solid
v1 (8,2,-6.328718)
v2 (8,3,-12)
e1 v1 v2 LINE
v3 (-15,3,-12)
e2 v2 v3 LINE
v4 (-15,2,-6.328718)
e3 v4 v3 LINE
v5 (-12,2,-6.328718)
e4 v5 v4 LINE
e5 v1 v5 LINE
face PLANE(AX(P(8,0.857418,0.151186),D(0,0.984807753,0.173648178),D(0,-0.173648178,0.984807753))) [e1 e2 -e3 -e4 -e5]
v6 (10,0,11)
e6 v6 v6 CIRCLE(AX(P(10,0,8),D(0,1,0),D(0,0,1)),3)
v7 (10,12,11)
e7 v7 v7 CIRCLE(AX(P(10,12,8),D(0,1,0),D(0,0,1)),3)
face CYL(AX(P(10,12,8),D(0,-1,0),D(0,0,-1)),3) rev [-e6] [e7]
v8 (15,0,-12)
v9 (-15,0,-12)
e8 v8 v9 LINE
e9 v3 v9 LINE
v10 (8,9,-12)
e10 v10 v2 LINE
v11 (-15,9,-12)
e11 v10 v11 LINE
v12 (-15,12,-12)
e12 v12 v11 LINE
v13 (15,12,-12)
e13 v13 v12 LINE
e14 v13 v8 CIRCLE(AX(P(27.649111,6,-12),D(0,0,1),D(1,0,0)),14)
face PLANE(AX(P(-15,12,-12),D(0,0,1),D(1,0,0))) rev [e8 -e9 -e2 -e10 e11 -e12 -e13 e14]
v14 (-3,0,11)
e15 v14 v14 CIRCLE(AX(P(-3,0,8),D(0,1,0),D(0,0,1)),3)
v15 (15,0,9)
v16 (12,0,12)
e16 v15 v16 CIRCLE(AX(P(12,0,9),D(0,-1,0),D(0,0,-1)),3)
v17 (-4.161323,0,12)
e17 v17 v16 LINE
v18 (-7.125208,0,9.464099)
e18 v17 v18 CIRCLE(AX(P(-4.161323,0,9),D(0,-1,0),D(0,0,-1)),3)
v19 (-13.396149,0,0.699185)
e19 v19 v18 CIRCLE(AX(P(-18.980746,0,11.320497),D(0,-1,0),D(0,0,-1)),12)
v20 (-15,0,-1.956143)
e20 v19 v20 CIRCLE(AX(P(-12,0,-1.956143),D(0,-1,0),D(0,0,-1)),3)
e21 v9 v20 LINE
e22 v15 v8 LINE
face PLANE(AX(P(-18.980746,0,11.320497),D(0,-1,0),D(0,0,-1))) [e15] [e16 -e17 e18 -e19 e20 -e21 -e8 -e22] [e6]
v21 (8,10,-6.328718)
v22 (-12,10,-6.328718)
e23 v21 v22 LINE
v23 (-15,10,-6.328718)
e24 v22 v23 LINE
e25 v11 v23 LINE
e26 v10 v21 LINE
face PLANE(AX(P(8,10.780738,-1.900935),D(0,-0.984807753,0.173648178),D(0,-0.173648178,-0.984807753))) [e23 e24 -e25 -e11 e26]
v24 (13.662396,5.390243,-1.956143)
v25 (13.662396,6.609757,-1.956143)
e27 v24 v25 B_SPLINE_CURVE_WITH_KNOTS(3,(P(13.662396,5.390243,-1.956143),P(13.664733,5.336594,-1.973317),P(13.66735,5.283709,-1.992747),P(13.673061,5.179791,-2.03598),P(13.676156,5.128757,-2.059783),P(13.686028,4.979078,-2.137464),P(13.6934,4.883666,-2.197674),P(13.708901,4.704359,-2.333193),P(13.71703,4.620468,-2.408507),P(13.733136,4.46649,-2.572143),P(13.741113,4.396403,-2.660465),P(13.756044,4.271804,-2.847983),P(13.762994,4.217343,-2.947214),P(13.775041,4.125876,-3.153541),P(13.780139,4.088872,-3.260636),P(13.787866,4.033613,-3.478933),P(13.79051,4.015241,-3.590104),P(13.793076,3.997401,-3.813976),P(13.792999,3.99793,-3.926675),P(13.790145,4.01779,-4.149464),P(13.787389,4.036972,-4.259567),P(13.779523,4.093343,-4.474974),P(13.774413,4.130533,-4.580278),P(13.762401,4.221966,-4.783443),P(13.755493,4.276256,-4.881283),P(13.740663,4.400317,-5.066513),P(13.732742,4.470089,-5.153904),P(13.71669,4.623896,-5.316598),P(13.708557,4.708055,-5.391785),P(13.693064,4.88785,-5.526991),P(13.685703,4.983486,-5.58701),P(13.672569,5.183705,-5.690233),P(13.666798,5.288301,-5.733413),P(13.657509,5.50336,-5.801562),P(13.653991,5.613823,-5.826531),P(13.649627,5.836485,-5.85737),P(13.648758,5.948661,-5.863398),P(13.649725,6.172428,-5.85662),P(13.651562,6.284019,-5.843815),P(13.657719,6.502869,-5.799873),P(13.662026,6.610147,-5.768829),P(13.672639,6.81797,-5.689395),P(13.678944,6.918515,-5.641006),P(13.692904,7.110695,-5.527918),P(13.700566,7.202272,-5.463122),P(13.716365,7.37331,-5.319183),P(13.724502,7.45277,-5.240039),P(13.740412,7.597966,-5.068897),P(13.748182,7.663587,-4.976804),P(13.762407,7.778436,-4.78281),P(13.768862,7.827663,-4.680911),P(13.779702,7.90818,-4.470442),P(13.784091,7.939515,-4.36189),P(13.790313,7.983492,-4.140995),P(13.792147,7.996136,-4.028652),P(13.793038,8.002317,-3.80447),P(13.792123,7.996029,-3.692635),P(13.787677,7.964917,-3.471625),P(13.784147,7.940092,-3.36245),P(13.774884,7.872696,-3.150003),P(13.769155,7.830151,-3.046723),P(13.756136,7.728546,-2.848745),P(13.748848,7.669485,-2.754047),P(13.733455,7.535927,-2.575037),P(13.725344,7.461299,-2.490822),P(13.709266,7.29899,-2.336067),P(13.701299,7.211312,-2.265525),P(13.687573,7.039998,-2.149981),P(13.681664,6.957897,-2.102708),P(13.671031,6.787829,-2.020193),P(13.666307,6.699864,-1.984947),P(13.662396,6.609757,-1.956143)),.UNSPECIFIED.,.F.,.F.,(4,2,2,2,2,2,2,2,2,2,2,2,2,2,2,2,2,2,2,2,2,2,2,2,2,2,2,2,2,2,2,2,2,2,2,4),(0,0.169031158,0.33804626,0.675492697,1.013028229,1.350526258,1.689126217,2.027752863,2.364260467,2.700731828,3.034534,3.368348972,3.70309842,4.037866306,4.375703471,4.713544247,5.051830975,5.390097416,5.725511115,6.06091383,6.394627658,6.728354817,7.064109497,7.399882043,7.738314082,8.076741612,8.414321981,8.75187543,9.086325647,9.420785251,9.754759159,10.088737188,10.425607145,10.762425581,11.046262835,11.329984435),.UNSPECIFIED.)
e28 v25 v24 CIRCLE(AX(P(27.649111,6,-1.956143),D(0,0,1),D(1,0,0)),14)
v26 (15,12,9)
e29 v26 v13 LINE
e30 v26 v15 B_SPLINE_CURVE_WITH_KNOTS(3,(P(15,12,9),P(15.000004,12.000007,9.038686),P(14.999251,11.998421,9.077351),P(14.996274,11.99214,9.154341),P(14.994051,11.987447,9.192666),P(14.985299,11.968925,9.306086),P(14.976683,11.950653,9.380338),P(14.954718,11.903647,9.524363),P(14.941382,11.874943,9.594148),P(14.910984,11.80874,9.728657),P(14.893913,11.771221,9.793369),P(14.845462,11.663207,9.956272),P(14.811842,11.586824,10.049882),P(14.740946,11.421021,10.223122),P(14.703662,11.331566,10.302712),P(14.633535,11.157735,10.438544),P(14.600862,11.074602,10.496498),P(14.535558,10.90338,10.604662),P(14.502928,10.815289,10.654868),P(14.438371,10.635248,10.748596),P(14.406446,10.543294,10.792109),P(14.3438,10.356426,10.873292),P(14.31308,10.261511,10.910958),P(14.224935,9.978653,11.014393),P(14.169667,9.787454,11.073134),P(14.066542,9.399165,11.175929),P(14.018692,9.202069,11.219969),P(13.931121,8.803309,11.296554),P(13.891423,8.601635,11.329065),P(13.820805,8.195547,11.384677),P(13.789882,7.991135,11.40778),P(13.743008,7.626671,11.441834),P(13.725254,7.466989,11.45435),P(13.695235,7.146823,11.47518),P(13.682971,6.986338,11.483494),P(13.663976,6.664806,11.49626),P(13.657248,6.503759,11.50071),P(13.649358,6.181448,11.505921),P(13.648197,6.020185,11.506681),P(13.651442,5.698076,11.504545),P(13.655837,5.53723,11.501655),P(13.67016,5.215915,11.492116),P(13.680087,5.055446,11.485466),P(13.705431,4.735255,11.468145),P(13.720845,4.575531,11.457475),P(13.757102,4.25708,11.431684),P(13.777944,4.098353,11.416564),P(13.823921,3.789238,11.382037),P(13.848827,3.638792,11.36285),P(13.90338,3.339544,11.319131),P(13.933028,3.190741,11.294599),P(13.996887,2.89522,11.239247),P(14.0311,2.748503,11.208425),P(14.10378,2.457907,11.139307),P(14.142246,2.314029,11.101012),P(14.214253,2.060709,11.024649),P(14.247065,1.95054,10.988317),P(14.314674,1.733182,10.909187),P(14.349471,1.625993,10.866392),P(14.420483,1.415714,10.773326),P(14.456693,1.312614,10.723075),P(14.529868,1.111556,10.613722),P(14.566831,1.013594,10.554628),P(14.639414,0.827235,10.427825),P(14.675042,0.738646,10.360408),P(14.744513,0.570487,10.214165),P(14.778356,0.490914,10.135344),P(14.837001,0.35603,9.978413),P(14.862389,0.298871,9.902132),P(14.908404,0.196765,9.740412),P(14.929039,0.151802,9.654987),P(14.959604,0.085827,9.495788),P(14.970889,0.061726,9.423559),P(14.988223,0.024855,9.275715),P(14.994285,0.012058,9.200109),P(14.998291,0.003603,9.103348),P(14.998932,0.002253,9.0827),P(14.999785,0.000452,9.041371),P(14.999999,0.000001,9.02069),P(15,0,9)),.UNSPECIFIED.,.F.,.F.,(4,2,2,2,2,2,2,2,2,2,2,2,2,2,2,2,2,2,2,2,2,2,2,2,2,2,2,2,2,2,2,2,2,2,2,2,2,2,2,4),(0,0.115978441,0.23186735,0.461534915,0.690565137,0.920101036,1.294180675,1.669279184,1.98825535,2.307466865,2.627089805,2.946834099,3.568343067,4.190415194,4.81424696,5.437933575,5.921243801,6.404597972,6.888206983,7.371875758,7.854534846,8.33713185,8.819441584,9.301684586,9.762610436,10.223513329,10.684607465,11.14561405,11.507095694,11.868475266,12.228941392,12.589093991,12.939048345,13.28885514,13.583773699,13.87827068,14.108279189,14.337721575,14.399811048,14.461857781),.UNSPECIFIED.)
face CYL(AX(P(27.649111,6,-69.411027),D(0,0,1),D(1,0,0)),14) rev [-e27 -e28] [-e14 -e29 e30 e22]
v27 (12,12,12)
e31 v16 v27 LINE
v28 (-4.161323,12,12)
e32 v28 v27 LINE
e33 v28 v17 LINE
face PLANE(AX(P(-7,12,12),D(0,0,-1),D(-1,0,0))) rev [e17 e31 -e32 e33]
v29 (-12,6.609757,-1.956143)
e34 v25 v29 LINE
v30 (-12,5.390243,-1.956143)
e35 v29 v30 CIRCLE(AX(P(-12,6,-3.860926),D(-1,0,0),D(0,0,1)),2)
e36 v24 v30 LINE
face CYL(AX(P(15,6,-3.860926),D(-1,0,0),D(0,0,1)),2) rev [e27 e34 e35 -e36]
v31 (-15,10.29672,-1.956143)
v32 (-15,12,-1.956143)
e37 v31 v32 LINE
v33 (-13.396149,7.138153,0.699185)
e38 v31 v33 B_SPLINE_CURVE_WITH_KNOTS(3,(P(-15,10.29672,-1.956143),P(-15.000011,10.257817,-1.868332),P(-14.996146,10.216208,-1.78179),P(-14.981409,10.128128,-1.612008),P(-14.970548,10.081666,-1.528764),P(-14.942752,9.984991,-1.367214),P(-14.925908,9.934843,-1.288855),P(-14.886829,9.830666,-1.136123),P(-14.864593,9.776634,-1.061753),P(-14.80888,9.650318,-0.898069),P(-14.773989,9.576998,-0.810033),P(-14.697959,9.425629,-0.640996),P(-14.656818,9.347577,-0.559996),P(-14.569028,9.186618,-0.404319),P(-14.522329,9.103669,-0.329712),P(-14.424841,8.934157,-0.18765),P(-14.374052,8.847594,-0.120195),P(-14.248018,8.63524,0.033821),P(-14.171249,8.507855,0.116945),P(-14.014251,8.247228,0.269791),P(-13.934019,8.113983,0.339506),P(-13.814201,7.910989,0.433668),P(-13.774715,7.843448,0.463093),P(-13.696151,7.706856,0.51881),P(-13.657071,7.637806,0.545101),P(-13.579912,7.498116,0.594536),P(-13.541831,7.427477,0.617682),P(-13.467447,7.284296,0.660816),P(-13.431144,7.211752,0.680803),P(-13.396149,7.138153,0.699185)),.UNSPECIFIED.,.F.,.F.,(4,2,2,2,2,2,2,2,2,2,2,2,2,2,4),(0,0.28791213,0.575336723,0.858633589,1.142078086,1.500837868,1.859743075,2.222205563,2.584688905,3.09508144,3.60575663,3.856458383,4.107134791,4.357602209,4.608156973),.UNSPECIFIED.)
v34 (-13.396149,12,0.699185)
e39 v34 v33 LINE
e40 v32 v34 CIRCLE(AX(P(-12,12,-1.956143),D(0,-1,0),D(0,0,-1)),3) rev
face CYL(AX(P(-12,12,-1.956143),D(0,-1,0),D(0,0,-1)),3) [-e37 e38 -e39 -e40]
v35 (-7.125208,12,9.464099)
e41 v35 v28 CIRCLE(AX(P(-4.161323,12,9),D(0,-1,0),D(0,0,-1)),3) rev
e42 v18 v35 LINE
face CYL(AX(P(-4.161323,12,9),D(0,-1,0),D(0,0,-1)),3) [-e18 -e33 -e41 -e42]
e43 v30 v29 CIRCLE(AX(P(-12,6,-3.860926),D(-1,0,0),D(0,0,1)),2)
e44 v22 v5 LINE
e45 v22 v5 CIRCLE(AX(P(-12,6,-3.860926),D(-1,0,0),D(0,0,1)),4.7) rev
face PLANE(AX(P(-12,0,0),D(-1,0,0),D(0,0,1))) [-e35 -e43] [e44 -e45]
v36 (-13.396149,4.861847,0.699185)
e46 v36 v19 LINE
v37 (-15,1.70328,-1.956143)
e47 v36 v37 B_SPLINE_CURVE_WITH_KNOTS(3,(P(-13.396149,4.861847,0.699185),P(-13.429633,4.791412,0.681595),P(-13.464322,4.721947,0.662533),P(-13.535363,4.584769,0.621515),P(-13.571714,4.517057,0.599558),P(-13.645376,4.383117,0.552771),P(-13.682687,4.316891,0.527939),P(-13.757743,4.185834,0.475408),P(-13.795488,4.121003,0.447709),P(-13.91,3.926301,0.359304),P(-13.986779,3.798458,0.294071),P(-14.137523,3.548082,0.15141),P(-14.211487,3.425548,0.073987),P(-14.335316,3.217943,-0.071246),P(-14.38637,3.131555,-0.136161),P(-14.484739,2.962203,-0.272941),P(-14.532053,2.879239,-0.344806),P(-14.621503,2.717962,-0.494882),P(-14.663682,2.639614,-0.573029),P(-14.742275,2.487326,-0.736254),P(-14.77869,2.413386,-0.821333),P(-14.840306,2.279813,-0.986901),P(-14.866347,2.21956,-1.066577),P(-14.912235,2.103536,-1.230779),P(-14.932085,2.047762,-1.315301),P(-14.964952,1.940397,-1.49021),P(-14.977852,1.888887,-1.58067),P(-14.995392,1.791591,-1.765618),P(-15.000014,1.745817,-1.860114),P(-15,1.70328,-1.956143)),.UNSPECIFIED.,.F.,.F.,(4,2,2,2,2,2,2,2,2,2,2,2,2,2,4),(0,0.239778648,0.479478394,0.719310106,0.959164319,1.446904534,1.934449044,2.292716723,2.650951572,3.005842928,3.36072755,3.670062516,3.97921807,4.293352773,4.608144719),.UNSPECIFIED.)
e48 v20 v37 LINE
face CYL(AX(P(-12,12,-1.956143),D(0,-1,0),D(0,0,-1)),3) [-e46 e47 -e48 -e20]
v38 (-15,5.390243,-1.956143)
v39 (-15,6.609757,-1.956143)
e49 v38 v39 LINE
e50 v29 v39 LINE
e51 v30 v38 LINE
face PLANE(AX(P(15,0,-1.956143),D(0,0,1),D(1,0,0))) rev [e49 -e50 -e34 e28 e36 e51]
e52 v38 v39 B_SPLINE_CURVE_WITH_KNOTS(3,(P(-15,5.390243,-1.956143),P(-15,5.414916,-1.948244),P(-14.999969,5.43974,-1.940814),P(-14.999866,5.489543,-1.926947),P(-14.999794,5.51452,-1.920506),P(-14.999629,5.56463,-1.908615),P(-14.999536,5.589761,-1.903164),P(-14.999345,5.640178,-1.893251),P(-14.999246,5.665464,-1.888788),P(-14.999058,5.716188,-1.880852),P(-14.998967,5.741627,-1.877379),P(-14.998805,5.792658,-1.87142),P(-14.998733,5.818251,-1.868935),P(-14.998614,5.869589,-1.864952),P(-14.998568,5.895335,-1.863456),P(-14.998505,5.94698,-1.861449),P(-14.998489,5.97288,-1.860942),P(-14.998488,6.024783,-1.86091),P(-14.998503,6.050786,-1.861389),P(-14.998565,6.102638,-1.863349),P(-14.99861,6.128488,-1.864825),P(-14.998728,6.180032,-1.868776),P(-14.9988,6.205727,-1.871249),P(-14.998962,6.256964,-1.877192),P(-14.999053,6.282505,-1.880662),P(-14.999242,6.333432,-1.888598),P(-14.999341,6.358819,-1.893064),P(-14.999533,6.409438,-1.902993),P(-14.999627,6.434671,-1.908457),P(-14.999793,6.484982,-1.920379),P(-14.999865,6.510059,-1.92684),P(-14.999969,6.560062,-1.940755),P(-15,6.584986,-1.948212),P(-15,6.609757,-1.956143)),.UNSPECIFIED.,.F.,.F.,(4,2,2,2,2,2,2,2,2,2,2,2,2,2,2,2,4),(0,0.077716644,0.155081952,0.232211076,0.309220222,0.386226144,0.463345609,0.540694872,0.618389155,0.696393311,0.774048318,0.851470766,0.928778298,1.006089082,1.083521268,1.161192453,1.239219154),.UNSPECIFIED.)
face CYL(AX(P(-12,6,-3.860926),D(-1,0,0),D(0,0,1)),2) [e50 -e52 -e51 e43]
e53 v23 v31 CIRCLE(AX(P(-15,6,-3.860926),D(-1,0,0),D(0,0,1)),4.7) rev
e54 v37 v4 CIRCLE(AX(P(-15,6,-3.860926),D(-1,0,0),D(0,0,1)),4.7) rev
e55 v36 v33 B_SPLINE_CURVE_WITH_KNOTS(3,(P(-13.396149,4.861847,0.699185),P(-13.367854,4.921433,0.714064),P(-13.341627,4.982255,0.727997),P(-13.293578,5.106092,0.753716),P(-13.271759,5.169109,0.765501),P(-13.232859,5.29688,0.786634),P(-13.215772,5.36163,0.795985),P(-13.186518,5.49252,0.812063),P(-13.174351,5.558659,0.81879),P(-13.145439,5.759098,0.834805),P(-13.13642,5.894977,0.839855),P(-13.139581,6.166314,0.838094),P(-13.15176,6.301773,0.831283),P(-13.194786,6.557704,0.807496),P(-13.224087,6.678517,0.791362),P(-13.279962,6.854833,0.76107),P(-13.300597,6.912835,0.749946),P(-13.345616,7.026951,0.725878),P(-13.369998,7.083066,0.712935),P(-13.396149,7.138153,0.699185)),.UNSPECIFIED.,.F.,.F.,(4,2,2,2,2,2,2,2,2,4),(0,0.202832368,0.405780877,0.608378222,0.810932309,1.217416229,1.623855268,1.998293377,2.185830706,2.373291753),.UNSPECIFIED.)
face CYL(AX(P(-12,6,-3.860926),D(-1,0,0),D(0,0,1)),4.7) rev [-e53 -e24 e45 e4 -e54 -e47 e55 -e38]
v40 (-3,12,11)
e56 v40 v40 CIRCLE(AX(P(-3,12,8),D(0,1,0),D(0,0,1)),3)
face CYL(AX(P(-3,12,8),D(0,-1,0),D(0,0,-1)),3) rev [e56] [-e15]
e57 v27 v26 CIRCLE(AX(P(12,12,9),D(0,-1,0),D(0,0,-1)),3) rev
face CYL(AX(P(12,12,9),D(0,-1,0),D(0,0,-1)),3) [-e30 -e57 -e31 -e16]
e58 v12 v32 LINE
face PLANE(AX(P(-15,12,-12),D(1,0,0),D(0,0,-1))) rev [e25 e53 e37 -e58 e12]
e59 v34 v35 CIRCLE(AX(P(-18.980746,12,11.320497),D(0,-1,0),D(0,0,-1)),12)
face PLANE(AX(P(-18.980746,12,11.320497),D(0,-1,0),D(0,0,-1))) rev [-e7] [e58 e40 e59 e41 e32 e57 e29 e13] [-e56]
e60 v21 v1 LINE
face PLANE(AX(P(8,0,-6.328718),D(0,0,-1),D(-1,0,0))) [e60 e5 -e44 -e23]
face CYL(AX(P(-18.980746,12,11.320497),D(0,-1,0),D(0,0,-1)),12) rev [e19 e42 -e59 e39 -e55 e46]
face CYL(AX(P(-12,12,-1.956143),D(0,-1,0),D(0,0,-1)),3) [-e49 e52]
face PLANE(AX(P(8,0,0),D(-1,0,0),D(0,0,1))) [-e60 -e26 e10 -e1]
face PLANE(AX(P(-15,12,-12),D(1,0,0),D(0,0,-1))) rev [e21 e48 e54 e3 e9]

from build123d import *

# Parameters (mm, degrees)
SKETCH_1_R               = 3
EXTRUDE_1_DEPTH          = 12
FILLET_1_R               = 3
FILLET_2_R               = 3
CUT_EXTRUDE_1_DEPTH      = 23
CUT_EXTRUDE_2_DEPTH      = 35.467375879
SKETCH_2_4_R             = 2
CUT_EXTRUDE_3_DEPTH      = 3
CUT_EXTRUDE_8_DEPTH      = 31.740852386
CUT_EXTRUDE_8_DEPTH_BACK = 31.740852386


with BuildPart() as part:
    # 草图1 → 凸台-拉伸1 (new body)
    with BuildSketch(Plane(origin=(0, 0, 0), x_dir=(1, 0, 0), z_dir=(0, 1, 0))):
        with BuildLine():
            Line((-15, 12), (15, 12))
            Line((15, 12), (15, -12))
            Line((15, -12), (-7, -12))
            ThreePointArc((-7, -12), (-8.996142529, -4.664095019), (-15, 0))
            Line((-15, 0), (-15, 12))
        make_face()
        with Locations((10, -8)):
            Circle(SKETCH_1_R, mode=Mode.SUBTRACT)
        with Locations((-3, -8)):
            Circle(SKETCH_1_R, mode=Mode.SUBTRACT)
    extrude(amount=EXTRUDE_1_DEPTH)

    # 圆角1
    fillet_1_edges = [part.edges().sort_by_distance(p)[0] for p in [
        (-7, 6, 12),
        (-15, 6, 0),
    ]]
    fillet(fillet_1_edges, radius=FILLET_1_R)

    # 圆角2
    fillet_2_edges = [part.edges().sort_by_distance(p)[0] for p in [
        (15, 6, 12),
    ]]
    fillet(fillet_2_edges, radius=FILLET_2_R)

    # 草图2 → 切除-拉伸1 (cut)
    with BuildSketch(Plane.ZY.offset(15)):
        Polygon((-6.32871818, 2), (-6.32871818, 10), (-12, 9), (-12, 3), align=None)
    extrude(amount=-CUT_EXTRUDE_1_DEPTH, mode=Mode.SUBTRACT)

    # 草图2<3> → 切除-拉伸2 (cut, through all)
    with BuildSketch(Plane.ZY.offset(15)):
        with BuildLine():
            Line((-1.956143181, 5.390242862), (-1.956143181, 6.609757138))
            ThreePointArc((-1.956143181, 6.609757138), (-5.860925645, 6), (-1.956143181, 5.390242862))
        make_face()
    extrude(amount=-CUT_EXTRUDE_2_DEPTH, mode=Mode.SUBTRACT)

    # 草图2<4> → 切除-拉伸3 (cut)
    with BuildSketch(Plane.ZY.offset(15)):
        with BuildLine():
            ThreePointArc((-6.32871818, 2), (0.839074355, 6), (-6.32871818, 10))
            Line((-6.32871818, 10), (-6.32871818, 2))
        make_face()
        with Locations((-3.860925645, 6)):
            Circle(SKETCH_2_4_R, mode=Mode.SUBTRACT)
    extrude(amount=-CUT_EXTRUDE_3_DEPTH, mode=Mode.SUBTRACT)

    # 草图4 → 切除-拉伸8 (cut, two sides: drawn at the far end of the back side and taken through both)
    with BuildSketch(Plane(origin=(0, 0, -12), x_dir=(-1, 0, 0), z_dir=(0, 0, -1)).offset(-CUT_EXTRUDE_8_DEPTH_BACK)):
        with BuildLine():
            Line((-46.980847691, 79.421546804), (-15, 12))
            ThreePointArc((-15, 12), (-13.649110641, 6), (-15, 0))
            Line((-15, 0), (-46.980847691, -67.421546804))
            Line((-46.980847691, -67.421546804), (-196.224803582, -67.421546804))
            Line((-196.224803582, -67.421546804), (-196.224803582, 79.421546804))
            Line((-196.224803582, 79.421546804), (-46.980847691, 79.421546804))
        make_face()
    extrude(amount=CUT_EXTRUDE_8_DEPTH + CUT_EXTRUDE_8_DEPTH_BACK, mode=Mode.SUBTRACT)


solid = part.part
